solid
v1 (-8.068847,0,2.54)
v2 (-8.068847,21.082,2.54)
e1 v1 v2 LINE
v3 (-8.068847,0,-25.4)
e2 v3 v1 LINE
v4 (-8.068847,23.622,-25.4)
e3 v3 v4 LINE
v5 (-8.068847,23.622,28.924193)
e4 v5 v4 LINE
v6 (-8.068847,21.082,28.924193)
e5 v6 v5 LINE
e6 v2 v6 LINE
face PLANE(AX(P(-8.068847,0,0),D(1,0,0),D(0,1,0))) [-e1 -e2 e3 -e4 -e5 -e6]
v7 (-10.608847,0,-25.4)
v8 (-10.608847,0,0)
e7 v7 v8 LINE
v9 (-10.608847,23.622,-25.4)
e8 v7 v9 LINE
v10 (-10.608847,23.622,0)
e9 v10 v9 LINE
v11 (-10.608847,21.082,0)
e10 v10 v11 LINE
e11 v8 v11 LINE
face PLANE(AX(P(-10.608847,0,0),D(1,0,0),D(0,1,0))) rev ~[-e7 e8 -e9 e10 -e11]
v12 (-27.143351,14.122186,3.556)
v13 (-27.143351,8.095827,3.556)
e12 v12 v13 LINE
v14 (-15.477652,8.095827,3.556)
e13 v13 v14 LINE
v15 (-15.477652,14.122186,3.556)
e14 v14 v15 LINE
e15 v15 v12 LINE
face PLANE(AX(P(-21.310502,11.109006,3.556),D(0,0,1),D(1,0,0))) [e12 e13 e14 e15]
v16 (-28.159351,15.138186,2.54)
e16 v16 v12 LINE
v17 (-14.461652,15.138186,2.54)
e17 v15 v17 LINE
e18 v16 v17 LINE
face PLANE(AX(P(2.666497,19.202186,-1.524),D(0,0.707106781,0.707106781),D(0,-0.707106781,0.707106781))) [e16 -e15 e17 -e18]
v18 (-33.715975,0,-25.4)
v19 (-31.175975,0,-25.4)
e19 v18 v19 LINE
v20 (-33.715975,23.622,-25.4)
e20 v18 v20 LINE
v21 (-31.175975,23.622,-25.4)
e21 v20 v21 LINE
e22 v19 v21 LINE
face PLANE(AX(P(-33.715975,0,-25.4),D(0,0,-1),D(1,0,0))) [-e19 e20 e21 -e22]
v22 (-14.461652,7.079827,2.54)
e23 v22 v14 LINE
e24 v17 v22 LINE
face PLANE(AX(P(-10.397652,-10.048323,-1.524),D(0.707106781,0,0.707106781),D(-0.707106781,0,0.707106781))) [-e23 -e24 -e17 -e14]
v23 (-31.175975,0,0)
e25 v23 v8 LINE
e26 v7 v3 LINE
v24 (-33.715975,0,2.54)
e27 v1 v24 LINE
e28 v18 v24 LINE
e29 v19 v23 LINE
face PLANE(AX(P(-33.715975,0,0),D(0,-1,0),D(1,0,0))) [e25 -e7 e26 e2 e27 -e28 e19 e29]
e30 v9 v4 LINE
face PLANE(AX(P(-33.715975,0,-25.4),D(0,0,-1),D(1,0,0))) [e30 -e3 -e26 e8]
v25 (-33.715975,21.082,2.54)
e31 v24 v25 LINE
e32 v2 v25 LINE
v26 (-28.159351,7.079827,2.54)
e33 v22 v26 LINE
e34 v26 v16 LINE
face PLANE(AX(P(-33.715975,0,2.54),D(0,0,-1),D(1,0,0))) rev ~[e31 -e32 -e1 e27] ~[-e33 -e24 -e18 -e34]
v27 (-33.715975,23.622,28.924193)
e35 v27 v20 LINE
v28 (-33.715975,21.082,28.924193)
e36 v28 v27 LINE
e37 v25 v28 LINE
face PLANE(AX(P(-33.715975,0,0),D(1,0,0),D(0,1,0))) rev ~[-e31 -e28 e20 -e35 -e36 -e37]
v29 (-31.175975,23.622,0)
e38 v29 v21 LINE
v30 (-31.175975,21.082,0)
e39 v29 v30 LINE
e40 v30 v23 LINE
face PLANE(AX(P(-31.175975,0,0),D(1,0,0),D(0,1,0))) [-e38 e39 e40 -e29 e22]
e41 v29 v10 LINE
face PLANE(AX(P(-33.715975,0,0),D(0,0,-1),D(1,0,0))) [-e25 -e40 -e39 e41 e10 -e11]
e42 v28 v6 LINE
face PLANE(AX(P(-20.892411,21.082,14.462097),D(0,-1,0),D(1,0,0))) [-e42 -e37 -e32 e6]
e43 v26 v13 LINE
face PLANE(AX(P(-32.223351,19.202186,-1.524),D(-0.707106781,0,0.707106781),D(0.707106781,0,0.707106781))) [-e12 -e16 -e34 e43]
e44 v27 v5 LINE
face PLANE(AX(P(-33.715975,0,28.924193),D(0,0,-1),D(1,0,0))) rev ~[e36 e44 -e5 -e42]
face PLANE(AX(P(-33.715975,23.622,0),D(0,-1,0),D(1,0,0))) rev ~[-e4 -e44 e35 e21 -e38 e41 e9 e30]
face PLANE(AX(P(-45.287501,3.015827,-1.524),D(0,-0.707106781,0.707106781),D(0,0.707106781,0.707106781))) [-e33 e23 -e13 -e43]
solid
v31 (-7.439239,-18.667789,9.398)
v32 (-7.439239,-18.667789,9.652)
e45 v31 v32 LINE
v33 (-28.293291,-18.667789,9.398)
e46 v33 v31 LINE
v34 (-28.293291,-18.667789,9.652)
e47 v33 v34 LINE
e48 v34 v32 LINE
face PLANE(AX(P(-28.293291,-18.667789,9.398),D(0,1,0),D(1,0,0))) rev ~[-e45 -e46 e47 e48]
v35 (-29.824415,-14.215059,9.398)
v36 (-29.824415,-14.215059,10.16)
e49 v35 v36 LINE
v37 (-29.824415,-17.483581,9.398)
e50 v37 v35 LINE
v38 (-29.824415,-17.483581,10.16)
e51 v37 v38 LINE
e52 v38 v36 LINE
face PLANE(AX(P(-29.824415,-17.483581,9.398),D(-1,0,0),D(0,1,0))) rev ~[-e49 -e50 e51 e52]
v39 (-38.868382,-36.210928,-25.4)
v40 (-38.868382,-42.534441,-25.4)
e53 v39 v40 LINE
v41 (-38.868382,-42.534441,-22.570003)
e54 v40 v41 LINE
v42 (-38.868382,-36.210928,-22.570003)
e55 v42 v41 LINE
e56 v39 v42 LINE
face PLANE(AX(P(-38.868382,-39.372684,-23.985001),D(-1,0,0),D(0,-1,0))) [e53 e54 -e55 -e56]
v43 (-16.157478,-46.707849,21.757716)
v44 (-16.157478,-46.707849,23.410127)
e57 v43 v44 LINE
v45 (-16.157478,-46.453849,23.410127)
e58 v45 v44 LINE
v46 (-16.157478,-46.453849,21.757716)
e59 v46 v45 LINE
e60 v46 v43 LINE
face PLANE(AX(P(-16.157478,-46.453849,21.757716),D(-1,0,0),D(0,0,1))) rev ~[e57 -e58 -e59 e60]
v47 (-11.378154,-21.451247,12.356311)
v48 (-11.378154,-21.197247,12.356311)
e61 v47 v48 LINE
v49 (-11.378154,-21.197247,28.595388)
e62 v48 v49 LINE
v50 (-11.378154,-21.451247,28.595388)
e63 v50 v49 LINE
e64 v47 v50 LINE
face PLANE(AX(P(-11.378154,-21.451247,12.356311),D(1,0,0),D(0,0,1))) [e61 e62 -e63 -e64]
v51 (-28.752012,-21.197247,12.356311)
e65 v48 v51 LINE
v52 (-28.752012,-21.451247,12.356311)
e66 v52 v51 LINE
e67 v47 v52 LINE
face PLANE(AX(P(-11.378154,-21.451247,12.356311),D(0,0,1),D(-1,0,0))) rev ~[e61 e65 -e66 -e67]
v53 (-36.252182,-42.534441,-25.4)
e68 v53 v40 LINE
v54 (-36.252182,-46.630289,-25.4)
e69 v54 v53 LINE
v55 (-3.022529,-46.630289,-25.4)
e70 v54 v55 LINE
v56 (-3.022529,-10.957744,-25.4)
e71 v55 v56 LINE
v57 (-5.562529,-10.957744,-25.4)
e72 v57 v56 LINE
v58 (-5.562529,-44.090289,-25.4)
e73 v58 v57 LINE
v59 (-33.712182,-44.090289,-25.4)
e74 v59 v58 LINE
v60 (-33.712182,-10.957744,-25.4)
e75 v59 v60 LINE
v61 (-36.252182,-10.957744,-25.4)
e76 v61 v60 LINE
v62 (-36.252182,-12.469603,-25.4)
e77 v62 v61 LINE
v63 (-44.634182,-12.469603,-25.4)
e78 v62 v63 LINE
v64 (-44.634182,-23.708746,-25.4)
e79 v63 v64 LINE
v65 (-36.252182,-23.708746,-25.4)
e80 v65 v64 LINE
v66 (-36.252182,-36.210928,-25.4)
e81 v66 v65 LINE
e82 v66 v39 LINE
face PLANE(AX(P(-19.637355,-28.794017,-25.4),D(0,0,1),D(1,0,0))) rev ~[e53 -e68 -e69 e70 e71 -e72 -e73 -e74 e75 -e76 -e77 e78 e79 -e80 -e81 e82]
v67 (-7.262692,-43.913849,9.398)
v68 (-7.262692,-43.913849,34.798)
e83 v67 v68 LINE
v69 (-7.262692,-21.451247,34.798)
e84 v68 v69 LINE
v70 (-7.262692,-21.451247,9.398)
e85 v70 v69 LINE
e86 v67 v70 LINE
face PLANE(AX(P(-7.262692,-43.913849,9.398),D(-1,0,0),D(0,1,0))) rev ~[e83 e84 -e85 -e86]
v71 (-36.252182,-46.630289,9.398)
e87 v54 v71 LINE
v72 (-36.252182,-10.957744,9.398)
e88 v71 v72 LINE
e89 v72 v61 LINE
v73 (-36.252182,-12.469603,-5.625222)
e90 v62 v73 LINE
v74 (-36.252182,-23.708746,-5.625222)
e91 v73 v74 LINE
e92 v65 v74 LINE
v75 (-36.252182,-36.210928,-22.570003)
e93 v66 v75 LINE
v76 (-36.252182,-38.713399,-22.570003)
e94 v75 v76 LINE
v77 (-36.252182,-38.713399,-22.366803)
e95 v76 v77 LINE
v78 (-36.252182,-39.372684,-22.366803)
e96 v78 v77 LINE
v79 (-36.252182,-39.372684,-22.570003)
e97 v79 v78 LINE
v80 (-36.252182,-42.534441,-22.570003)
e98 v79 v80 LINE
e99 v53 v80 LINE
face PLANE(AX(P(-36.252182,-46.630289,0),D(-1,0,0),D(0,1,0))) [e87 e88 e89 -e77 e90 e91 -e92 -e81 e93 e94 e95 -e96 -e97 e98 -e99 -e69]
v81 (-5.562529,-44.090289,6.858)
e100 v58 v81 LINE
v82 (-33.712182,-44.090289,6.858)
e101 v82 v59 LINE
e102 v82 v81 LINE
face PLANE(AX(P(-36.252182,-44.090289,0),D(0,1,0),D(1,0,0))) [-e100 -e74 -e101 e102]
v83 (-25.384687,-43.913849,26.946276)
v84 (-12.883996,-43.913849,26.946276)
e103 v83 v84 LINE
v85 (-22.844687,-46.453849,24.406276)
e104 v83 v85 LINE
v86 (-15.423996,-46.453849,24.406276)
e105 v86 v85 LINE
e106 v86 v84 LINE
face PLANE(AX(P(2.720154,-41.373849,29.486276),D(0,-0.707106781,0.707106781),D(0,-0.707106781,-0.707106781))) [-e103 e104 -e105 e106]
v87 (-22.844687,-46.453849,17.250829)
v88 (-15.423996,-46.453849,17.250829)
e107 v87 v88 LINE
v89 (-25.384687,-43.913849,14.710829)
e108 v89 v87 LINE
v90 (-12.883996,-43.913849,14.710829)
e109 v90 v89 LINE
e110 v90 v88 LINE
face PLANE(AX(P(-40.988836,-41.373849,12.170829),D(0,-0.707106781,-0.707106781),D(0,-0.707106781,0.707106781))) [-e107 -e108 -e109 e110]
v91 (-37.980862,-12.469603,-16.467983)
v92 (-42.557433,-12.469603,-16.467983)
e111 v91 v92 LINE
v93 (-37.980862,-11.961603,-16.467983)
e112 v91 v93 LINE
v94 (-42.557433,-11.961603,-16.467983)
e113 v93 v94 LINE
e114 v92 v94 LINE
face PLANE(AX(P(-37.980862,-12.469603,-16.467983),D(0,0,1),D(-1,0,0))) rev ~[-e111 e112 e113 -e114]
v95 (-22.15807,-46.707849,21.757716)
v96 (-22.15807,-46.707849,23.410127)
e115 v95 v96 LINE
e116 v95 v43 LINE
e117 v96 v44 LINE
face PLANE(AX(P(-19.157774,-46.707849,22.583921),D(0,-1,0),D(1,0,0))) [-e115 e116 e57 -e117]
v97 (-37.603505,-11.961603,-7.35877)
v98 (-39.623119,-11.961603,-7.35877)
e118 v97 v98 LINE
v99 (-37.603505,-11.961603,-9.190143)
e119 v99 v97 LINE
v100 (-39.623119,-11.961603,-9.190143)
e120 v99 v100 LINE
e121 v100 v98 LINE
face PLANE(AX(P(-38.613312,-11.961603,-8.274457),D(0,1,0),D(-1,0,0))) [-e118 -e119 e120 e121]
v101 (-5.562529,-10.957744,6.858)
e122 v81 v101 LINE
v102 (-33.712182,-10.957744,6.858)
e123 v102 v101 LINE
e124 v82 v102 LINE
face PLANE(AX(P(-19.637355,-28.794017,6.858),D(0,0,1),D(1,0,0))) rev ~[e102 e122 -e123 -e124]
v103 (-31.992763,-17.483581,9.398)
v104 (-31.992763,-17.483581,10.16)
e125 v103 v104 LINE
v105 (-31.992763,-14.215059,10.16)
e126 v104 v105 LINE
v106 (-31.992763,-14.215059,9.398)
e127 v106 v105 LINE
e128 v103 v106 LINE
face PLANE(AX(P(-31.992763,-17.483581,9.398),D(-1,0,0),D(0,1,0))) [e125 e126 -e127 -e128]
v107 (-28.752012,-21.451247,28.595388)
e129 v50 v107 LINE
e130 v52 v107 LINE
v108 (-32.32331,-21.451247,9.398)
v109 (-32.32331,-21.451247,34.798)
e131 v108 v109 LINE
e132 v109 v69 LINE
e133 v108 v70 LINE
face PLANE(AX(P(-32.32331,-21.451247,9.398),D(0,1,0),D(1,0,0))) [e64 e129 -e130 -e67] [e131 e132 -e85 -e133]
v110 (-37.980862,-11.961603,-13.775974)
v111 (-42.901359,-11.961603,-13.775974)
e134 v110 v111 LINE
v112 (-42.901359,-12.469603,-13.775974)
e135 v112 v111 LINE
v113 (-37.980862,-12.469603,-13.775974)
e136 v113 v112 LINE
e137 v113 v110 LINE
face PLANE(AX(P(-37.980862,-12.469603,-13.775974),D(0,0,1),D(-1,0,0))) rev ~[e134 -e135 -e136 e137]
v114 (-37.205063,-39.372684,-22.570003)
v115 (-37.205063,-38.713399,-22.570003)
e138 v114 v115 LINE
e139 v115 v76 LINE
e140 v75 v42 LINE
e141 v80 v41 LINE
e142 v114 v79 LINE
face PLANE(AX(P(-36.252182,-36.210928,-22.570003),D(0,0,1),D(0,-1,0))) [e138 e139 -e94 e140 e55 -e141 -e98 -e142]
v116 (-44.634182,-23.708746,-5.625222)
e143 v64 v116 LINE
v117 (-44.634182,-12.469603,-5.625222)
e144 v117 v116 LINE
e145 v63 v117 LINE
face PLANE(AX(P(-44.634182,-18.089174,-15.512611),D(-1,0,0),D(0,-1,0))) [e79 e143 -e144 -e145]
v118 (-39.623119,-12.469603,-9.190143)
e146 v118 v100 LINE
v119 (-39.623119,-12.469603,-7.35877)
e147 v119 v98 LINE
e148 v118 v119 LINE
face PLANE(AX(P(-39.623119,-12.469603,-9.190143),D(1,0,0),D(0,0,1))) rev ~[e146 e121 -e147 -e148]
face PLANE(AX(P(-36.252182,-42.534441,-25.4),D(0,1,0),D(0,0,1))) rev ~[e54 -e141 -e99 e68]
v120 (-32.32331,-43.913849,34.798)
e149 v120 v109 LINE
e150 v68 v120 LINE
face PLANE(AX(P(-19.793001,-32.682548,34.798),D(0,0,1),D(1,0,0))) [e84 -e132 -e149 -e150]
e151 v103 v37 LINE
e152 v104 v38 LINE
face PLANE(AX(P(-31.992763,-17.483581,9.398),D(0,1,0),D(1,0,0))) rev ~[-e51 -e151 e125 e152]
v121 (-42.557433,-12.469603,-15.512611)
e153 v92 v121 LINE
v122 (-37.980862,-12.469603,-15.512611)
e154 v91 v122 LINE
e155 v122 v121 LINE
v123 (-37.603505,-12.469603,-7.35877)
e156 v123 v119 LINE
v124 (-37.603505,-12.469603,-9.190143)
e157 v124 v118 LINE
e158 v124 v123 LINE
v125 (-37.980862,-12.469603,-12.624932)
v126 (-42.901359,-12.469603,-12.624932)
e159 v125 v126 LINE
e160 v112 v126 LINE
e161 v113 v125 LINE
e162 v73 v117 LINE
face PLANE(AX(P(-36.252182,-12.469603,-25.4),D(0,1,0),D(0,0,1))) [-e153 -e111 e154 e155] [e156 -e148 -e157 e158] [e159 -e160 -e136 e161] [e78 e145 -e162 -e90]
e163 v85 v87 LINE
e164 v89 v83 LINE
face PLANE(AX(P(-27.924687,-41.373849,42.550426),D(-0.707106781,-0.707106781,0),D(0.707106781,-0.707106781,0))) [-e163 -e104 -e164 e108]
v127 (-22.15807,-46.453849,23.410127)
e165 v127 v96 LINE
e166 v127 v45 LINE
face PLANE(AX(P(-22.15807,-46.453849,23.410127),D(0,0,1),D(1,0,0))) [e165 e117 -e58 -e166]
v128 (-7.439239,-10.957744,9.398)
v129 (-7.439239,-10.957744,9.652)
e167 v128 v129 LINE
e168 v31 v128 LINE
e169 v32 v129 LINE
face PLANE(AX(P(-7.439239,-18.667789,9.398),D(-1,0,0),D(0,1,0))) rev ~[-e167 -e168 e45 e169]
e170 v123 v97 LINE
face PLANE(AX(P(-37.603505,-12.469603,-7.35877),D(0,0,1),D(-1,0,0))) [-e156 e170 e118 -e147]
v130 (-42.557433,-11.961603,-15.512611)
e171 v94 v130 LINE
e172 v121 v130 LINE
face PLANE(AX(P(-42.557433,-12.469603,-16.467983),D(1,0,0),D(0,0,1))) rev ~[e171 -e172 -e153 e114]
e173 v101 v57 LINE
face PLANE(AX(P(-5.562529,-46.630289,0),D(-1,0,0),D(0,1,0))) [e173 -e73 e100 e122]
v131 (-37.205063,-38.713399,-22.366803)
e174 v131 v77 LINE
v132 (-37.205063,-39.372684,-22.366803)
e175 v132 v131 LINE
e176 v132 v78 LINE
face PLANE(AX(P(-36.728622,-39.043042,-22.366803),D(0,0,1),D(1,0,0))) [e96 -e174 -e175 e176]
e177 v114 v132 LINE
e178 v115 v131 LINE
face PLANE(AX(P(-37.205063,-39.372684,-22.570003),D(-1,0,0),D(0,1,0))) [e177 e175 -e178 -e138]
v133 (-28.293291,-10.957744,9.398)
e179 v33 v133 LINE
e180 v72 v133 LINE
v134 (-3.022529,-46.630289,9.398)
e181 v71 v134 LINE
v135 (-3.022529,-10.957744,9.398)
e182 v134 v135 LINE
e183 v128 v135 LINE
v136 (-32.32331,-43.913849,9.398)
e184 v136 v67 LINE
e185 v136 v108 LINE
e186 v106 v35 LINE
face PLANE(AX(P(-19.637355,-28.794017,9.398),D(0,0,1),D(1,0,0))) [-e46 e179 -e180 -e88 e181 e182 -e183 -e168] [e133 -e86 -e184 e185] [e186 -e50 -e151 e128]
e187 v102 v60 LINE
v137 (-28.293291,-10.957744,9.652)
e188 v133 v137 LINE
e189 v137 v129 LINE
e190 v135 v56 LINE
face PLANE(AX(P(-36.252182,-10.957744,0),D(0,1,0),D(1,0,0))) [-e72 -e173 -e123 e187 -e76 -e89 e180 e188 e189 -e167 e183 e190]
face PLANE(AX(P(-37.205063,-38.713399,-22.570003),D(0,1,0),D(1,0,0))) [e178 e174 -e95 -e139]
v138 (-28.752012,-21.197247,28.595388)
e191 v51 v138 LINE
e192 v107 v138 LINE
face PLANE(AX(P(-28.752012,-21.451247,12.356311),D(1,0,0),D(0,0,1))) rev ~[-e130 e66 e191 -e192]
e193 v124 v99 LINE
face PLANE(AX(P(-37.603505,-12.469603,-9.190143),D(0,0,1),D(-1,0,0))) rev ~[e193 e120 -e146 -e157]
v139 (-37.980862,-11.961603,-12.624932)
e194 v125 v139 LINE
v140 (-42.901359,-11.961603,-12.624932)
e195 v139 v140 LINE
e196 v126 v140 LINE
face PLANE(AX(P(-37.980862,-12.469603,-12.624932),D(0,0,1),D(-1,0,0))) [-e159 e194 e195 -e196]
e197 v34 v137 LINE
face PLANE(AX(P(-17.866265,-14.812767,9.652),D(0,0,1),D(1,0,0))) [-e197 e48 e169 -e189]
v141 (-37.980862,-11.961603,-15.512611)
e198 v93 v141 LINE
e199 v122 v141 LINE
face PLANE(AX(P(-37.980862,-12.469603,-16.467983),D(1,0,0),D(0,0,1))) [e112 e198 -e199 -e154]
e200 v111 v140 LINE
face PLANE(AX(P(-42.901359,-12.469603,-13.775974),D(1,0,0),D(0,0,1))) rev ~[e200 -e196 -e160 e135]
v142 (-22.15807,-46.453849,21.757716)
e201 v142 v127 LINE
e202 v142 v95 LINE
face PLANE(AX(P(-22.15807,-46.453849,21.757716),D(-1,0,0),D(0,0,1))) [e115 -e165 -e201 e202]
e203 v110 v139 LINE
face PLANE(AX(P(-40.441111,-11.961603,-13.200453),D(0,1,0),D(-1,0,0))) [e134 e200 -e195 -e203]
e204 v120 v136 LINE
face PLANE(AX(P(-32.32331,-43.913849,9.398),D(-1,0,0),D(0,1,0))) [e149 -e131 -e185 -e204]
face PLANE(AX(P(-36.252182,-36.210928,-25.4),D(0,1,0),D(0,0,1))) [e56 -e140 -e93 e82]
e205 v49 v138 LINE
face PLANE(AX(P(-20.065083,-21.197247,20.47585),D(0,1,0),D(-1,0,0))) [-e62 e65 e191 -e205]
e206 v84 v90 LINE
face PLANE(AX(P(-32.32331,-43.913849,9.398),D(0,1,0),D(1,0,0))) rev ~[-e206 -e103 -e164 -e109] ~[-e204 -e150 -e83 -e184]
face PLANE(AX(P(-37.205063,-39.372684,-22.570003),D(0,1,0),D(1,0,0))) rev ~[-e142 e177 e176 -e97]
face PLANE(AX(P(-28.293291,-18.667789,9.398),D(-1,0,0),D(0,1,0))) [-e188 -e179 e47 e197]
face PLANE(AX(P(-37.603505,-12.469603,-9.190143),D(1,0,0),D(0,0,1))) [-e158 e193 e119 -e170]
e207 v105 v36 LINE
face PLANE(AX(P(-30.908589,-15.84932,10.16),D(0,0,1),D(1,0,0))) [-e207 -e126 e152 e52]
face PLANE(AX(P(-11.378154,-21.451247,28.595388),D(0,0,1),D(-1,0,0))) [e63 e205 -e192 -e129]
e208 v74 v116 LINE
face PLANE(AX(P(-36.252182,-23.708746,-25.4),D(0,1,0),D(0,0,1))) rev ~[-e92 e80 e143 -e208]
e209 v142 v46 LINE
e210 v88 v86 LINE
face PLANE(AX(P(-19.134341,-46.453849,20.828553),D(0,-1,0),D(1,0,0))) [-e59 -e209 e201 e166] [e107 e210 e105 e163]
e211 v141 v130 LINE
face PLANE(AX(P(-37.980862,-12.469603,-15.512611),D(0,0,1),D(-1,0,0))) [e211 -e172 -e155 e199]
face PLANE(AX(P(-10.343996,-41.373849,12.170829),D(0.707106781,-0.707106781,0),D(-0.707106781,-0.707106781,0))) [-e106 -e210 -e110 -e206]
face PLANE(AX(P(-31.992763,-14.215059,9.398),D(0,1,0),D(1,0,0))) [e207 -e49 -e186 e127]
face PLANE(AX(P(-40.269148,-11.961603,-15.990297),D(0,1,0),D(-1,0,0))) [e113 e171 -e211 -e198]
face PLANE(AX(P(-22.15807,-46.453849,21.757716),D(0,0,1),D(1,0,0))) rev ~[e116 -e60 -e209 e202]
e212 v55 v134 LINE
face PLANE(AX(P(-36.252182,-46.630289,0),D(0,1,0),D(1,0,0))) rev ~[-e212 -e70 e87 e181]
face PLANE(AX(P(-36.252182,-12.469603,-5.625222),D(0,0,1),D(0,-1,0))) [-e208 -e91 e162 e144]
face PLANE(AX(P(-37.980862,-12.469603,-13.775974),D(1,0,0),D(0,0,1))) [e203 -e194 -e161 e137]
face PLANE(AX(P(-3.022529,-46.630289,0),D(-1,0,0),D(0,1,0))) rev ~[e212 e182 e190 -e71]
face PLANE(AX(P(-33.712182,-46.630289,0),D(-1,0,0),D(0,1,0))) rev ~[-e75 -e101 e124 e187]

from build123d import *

# Parameters (mm, degrees)
F0_W          = 25.6471270695
F0_H          = 28.9241932333
F1_DEPTH      = 23.622
F2_T          = -2.54
F3_DEPTH      = 25.4
F4_T          = 2.54
F4_T3_DEPTH   = 30.7271270695
F5_W          = 33.229653025
F5_H          = 35.672545433
F6_DEPTH      = 25.4
F7_DEPTH      = 9.398
F8_T          = -2.54
F9_W          = 25.0606182963
F9_H          = 22.4626017734
F10_DEPTH     = 25.4
F11_W         = 17.3738580197
F11_H         = 16.2390768528
F12_DEPTH     = 0.254
F13_W         = 20.8540516905
F13_H         = 7.7100452036
F14_DEPTH     = 0.254
F15_W         = 17.5806907937
F15_H         = 17.3154473305
F16_DEPTH     = 2.54
F17_T4_DEPTH  = 43.7089899514
F17_T9_DEPTH  = 30.3795969093
F17_T14_DEPTH = 43.7089899514
F17_T19_DEPTH = 30.3795969093
F18_W         = 6.000591442
F18_H         = 1.6524102539
F19_DEPTH     = 0.254
F20_W         = 2.1683480591
F20_H         = 3.2685222104
F21_DEPTH     = 0.762
F22_W         = 21.8256991357
F22_H         = 16.1863591056
F23_DEPTH     = 1.016
F24_W         = 11.2391430885
F24_H         = 19.774777656
F25_DEPTH     = 8.382
F26_W         = 2.0196139812
F26_H         = 1.8313727342
F27_DEPTH     = 0.508
F28_W         = 4.9204975367
F28_H         = 1.1510411277
F29_DEPTH     = 0.508
F30_W         = 4.5765712857
F30_H         = 0.9553717311
F31_DEPTH     = 0.508
F32_W         = 6.3235126436
F32_H         = 2.8299971759
F33_DEPTH     = 2.6162
F34_W         = 0.9528808296
F34_H         = 0.6592851132
F35_DEPTH     = 0.2032
F36_T4_DEPTH  = 47.9539982934
F36_T9_DEPTH  = 29.2505086845
F36_T14_DEPTH = 47.9539982934
F36_T19_DEPTH = 29.2505086845
F37_W         = 0.83655864
F37_H         = 0.8337534964
F38_DEPTH     = 0.508
F37_W_2       = 0.7356256247
F37_H_2       = 0.5238540471
F37_W_3       = 1.1432357132
F37_H_3       = 0.6819479167
F37_W_4       = 0.7289908826
F37_H_4       = 0.5421712995
F37_W_5       = 1.2829229236
F37_H_5       = 0.4794821143
F37_W_6       = 0.6956644356
F37_H_6       = 0.5608797073
F37_W_7       = 1.0760016739
F37_H_7       = 0.4885531962
F37_W_8       = 0.6218552589
F37_H_8       = 0.4100985825
F37_W_9       = 0.7822141051
F37_H_9       = 0.4685148597
F37_W_10      = 1.0629147291
F37_H_10      = 0.598076731
F37_W_11      = 1.1558197439
F37_H_11      = 0.371992588
F37_W_12      = 0.8621029556
F37_H_12      = 0.3762468696
F37_W_13      = 0.7478930056
F37_H_13      = 0.5268156528
F37_W_14      = 1.0761059821
F37_H_14      = 0.5310699344


# Not quite as in the source:
# - a fillet or chamfer that OpenCascade refuses, or shapes differently, is made with other operations: its cross-section is extruded or revolved along the edge and cut away or added
# - a shell that OpenCascade refuses in one call is made with other operations: the cavity is built on its own and cut out


with BuildPart() as f1:
    # F0 (on Front) → F1 (new body)
    with BuildSketch(Plane.XZ):
        with Locations((-20.8924110048, 14.4620966166)):
            Rectangle(F0_W, F0_H)
    extrude(amount=-F1_DEPTH)

    # F2
    f2_openings = [f1.faces().sort_by_distance(p)[0] for p in [
        (-33.715975, 11.811, 14.462097),
        (-20.892411, 11.811, 28.924193),
        (-20.892411, 0, 14.462097),
        (-8.068847, 11.811, 14.462097),
    ]]
    offset(amount=F2_T, openings=f2_openings)

    # F3 (add): a face of the model
    f3_faces = [f1.faces().sort_by_distance(p)[0] for p in [
        (-20.8924110048, 11.811, 0),
    ]]
    extrude(f3_faces, amount=F3_DEPTH)

    # F4: shell of thickness 2.54, made by hand


with BuildPart() as f4_core1:
    # F4_t2: copy of F1
    add(f1.part)

    # the walls: a layer under each face that stays
    f4_faces = [f4_core1.faces().sort_by_distance(p)[0] for p in [
        (-8.06884747, 11.811, 1.7620966166),
        (-20.8924110048, 10.541, 2.54),
        (-20.8924110048, 21.082, 15.7320966166),
        (-33.7159745395, 11.811, 1.7620966166),
        (-20.8924110048, 22.352, 28.9241932333),
    ]]
    thicken(f4_faces, amount=-F4_T, mode=Mode.SUBTRACT)

    # F4_s4 → F4_t3 (cut)
    with BuildSketch(Plane.YZ.offset(-36.2559745395)):
        Polygon((21.0566, 2.5654), (21.082, 0), (23.622, 0), (23.622, 2.54), align=None)
    extrude(amount=F4_T3_DEPTH, mode=Mode.SUBTRACT)


with BuildPart() as f1_1:
    add(f1.part)

    # what is left inside the walls is the cavity
    f4_cavity = [f4_core1.part.solids().sort_by_distance(p)[0] for p in [
        (-31.150575, 15.748, -12.7),
    ]]
    add(f4_cavity, mode=Mode.SUBTRACT)

    # F22 (on face) → F23 (join)
    with BuildSketch(Plane.XY.offset(2.54)):
        with Locations((-21.3105017319, 11.1090062419)):
            Rectangle(F22_W, F22_H)
    extrude(amount=F23_DEPTH)

    # F36: chamfer of 5.08 on 4 edges, made by hand


with BuildPart() as f6:
    # F5 (on Top) → F6 (new body)
    with BuildSketch(Plane.XY):
        with Locations((-19.6373554645, -28.7940166891)):
            Rectangle(F5_W, F5_H)
    extrude(amount=-F6_DEPTH)

    # F7 (add): a face of the model
    f7_faces = [f6.faces().sort_by_distance(p)[0] for p in [
        (-19.6373554645, -28.7940166891, 0),
    ]]
    extrude(f7_faces, amount=F7_DEPTH)

    # F8
    f8_openings = [f6.faces().sort_by_distance(p)[0] for p in [
        (-19.637355, -28.794017, -25.4),
        (-19.637355, -10.957744, -8.001),
    ]]
    offset(amount=F8_T, openings=f8_openings)

    # F9 (on face) → F10 (join)
    with BuildSketch(Plane.XY.offset(9.398)):
        with Locations((-19.7930010036, -32.6825478114)):
            Rectangle(F9_W, F9_H)
    extrude(amount=F10_DEPTH)

    # F11 (on face) → F12 (join)
    with BuildSketch(Plane(origin=(0, -21.4512469247, 0), x_dir=(-1, 0, 0), z_dir=(0, 1, 0))):
        with Locations((20.0650831684, 20.4758495092)):
            Rectangle(F11_W, F11_H)
    extrude(amount=F12_DEPTH)

    # F13 (on face) → F14 (join)
    with BuildSketch(Plane.XY.offset(9.398)):
        with Locations((-17.8662652615, -14.8127665743)):
            Rectangle(F13_W, F13_H)
    extrude(amount=F14_DEPTH)

    # F15 (on face) → F16 (join)
    with BuildSketch(Plane.XZ.offset(43.9138486981)):
        with Locations((-19.1343412735, 20.8285525441)):
            Rectangle(F15_W, F15_H)
    extrude(amount=F16_DEPTH)

    # F17: chamfer of 5.08 on 4 edges, made by hand


with BuildPart() as f17_tool2:
    # F17_s3 → F17_t4 (new body)
    with BuildSketch(Plane.YZ.offset(2.7201537023)):
        Polygon((-41.3738486981, 29.4862762094), (-46.4538486981, 24.4062762094), (-46.4538486981, 29.4862762094), align=None)
    extrude(amount=-F17_T4_DEPTH)

    split(bisect_by=Plane.XZ.offset(43.9138486981), keep=Keep.TOP)


with BuildPart() as f6_1:
    add(f6.part)

    # F17_t1: cut F17_tool2
    add(f17_tool2.part, mode=Mode.SUBTRACT)


with BuildPart() as f17_tool7:
    # F17_s8 → F17_t9 (new body)
    with BuildSketch(Plane.XY.offset(42.5504257882)):
        Polygon((-27.9246866703, -41.3738486981), (-22.8446866703, -46.4538486981), (-27.9246866703, -46.4538486981), align=None)
    extrude(amount=-F17_T9_DEPTH)

    split(bisect_by=Plane.XZ.offset(43.9138486981), keep=Keep.TOP)


with BuildPart() as f6_2:
    add(f6_1.part)

    # F17_t6: cut F17_tool7
    add(f17_tool7.part, mode=Mode.SUBTRACT)


with BuildPart() as f17_tool12:
    # F17_s13 → F17_t14 (new body)
    with BuildSketch(Plane.YZ.offset(-40.9888362492)):
        Polygon((-41.3738486981, 12.1708288789), (-46.4538486981, 17.2508288789), (-46.4538486981, 12.1708288789), align=None)
    extrude(amount=F17_T14_DEPTH)

    split(bisect_by=Plane.XZ.offset(43.9138486981), keep=Keep.TOP)


with BuildPart() as f6_3:
    add(f6_2.part)

    # F17_t11: cut F17_tool12
    add(f17_tool12.part, mode=Mode.SUBTRACT)


with BuildPart() as f17_tool17:
    # F17_s18 → F17_t19 (new body)
    with BuildSketch(Plane.XY.offset(12.1708288789)):
        Polygon((-10.3439958766, -41.3738486981), (-15.4239958766, -46.4538486981), (-10.3439958766, -46.4538486981), align=None)
    extrude(amount=F17_T19_DEPTH)

    split(bisect_by=Plane.XZ.offset(43.9138486981), keep=Keep.TOP)


with BuildPart() as f6_4:
    add(f6_3.part)

    # F17_t16: cut F17_tool17
    add(f17_tool17.part, mode=Mode.SUBTRACT)

    # F18 (on face) → F19 (join)
    with BuildSketch(Plane.XZ.offset(46.4538486981)):
        with Locations((-19.1577738151, 22.5839214399)):
            Rectangle(F18_W, F18_H)
    extrude(amount=F19_DEPTH)

    # F20 (on face) → F21 (join)
    with BuildSketch(Plane.XY.offset(9.398)):
        with Locations((-30.9085892513, -15.8493197523)):
            Rectangle(F20_W, F20_H)
    extrude(amount=F21_DEPTH)

    # F24 (on face) → F25 (join)
    with BuildSketch(Plane(origin=(-36.252181977, 0, 0), x_dir=(0, -1, 0), z_dir=(-1, 0, 0))):
        with Locations((18.089174293, -15.512611172)):
            Rectangle(F24_W, F24_H)
    extrude(amount=F25_DEPTH)

    # F26 (on face) → F27 (join)
    with BuildSketch(Plane(origin=(0, -12.4696027488, 0), x_dir=(-1, 0, 0), z_dir=(0, 1, 0))):
        with Locations((38.6133119464, -8.2744567189)):
            Rectangle(F26_W, F26_H)
    extrude(amount=F27_DEPTH)

    # F28 (on face) → F29 (join)
    with BuildSketch(Plane(origin=(0, -12.4696027488, 0), x_dir=(-1, 0, 0), z_dir=(0, 1, 0))):
        with Locations((40.4411107302, -13.2004530169)):
            Rectangle(F28_W, F28_H)
    extrude(amount=F29_DEPTH)

    # F30 (on face) → F31 (join)
    with BuildSketch(Plane(origin=(0, -12.4696027488, 0), x_dir=(-1, 0, 0), z_dir=(0, 1, 0))):
        with Locations((40.2691476047, -15.9902970375)):
            Rectangle(F30_W, F30_H)
    extrude(amount=F31_DEPTH)

    # F32 (on face) → F33 (join)
    with BuildSketch(Plane(origin=(-36.252181977, 0, 0), x_dir=(0, -1, 0), z_dir=(-1, 0, 0))):
        with Locations((39.3726844341, -23.985001412)):
            Rectangle(F32_W, F32_H)
    extrude(amount=F33_DEPTH)

    # F34 (on face) → F35 (join)
    with BuildSketch(Plane.XY.offset(-22.5700028241)):
        with Locations((-36.7286223918, -39.0430418774)):
            Rectangle(F34_W, F34_H)
    extrude(amount=F35_DEPTH)


with BuildPart() as f36_tool2:
    # F36_s3 → F36_t4 (new body)
    with BuildSketch(Plane.YZ.offset(2.6664974148)):
        Polygon((19.2021857947, -1.524), (14.1221857947, 3.556), (19.2021857947, 3.556), align=None)
    extrude(amount=-F36_T4_DEPTH)

    split(bisect_by=Plane.XY.offset(2.54), keep=Keep.TOP)


with BuildPart() as f1_2:
    add(f1_1.part)

    # F36_t1: cut F36_tool2
    add(f36_tool2.part, mode=Mode.SUBTRACT)


with BuildPart() as f36_tool7:
    # F36_s8 → F36_t9 (new body)
    with BuildSketch(Plane.XZ.offset(-19.2021857947)):
        Polygon((-32.2233512998, -1.524), (-27.1433512998, 3.556), (-32.2233512998, 3.556), align=None)
    extrude(amount=F36_T9_DEPTH)

    split(bisect_by=Plane.XY.offset(2.54), keep=Keep.TOP)


with BuildPart() as f1_3:
    add(f1_2.part)

    # F36_t6: cut F36_tool7
    add(f36_tool7.part, mode=Mode.SUBTRACT)


with BuildPart() as f36_tool12:
    # F36_s13 → F36_t14 (new body)
    with BuildSketch(Plane.YZ.offset(-45.2875008786)):
        Polygon((3.0158266891, -1.524), (8.0958266891, 3.556), (3.0158266891, 3.556), align=None)
    extrude(amount=F36_T14_DEPTH)

    split(bisect_by=Plane.XY.offset(2.54), keep=Keep.TOP)


with BuildPart() as f1_4:
    add(f1_3.part)

    # F36_t11: cut F36_tool12
    add(f36_tool12.part, mode=Mode.SUBTRACT)


with BuildPart() as f36_tool17:
    # F36_s18 → F36_t19 (new body)
    with BuildSketch(Plane.XZ.offset(10.0483228898)):
        Polygon((-10.3976521641, -1.524), (-15.4776521641, 3.556), (-10.3976521641, 3.556), align=None)
    extrude(amount=-F36_T19_DEPTH)

    split(bisect_by=Plane.XY.offset(2.54), keep=Keep.TOP)


with BuildPart() as f1_5:
    add(f1_4.part)

    # F36_t16: cut F36_tool17
    add(f36_tool17.part, mode=Mode.SUBTRACT)


with BuildPart() as f38:
    # F37 (on Top) → F38 (new body)
    with BuildSketch(Plane.XY):
        Polygon((-47.7759763598, -38.6007763445), (-47.7759763598, -38.0017347634), (-48.7721376121, -38.0017347634), (-48.7721376121, -38.6007763445), (-48.6606992781, -38.6007763445), (-47.8241406381, -38.6007763445), align=None)
        with Locations((-48.2424199581, -39.0176530927)):
            Rectangle(F37_W, F37_H)
    extrude(amount=F38_DEPTH)


with BuildPart() as f38b:
    # F37 (on Top) → F38, piece 2 (new body)
    with BuildSketch(Plane.XY):
        with Locations((-47.1070185304, -37.4404694885)):
            Rectangle(F37_W_2, F37_H_2)
    extrude(amount=F38_DEPTH)


with BuildPart() as f38c:
    # F37 (on Top) → F38, piece 3 (new body)
    with BuildSketch(Plane.XY):
        with Locations((-48.2318531722, -37.4272111803)):
            Rectangle(F37_W_3, F37_H_3)
    extrude(amount=F38_DEPTH)


with BuildPart() as f38d:
    # F37 (on Top) → F38, piece 4 (new body)
    with BuildSketch(Plane.XY):
        with Locations((-47.1084099263, -36.6477929056)):
            Rectangle(F37_W_4, F37_H_4)
    extrude(amount=F38_DEPTH)


with BuildPart() as f38e:
    # F37 (on Top) → F38, piece 5 (new body)
    with BuildSketch(Plane.XY):
        with Locations((-48.2132434845, -36.6469696164)):
            Rectangle(F37_W_5, F37_H_5)
    extrude(amount=F38_DEPTH)


with BuildPart() as f38f:
    # F37 (on Top) → F38, piece 6 (new body)
    with BuildSketch(Plane.XY):
        with Locations((-47.1567194909, -35.9333977103)):
            Rectangle(F37_W_6, F37_H_6)
    extrude(amount=F38_DEPTH)


with BuildPart() as f38g:
    # F37 (on Top) → F38, piece 7 (new body)
    with BuildSketch(Plane.XY):
        with Locations((-48.3284760267, -35.9984207898)):
            Rectangle(F37_W_7, F37_H_7)
    extrude(amount=F38_DEPTH)


with BuildPart() as f38h:
    # F37 (on Top) → F38, piece 8 (new body)
    with BuildSketch(Plane.XY):
        with Locations((-47.1879057586, -39.1126889735)):
            Rectangle(F37_W_8, F37_H_8)
    extrude(amount=F38_DEPTH)


with BuildPart() as f38i:
    # F37 (on Top) → F38, piece 9 (new body)
    with BuildSketch(Plane.XY):
        with Locations((-47.2700297832, -39.9314910173)):
            Rectangle(F37_W_9, F37_H_9)
    extrude(amount=F38_DEPTH)


with BuildPart() as f38j:
    # F37 (on Top) → F38, piece 10 (new body)
    with BuildSketch(Plane.XY):
        with Locations((-48.4051033854, -40.0122273713)):
            Rectangle(F37_W_10, F37_H_10)
    extrude(amount=F38_DEPTH)


with BuildPart() as f38k:
    # F37 (on Top) → F38, piece 11 (new body)
    with BuildSketch(Plane.XY):
        with Locations((-47.4454332143, -40.679089725)):
            Rectangle(F37_W_11, F37_H_11)
    extrude(amount=F38_DEPTH)


with BuildPart() as f38l:
    # F37 (on Top) → F38, piece 12 (new body)
    with BuildSketch(Plane.XY):
        with Locations((-48.5138017684, -40.779016912)):
            Rectangle(F37_W_12, F37_H_12)
    extrude(amount=F38_DEPTH)


with BuildPart() as f38m:
    # F37 (on Top) → F38, piece 13 (new body)
    with BuildSketch(Plane.XY):
        with Locations((-47.1978355199, -41.4876379073)):
            Rectangle(F37_W_13, F37_H_13)
    extrude(amount=F38_DEPTH)


with BuildPart() as f38n:
    # F37 (on Top) → F38, piece 14 (new body)
    with BuildSketch(Plane.XY):
        with Locations((-48.5091153532, -41.5869280696)):
            Rectangle(F37_W_14, F37_H_14)
    extrude(amount=F38_DEPTH)


solid = Compound([f6_4.part, f1_5.part])
